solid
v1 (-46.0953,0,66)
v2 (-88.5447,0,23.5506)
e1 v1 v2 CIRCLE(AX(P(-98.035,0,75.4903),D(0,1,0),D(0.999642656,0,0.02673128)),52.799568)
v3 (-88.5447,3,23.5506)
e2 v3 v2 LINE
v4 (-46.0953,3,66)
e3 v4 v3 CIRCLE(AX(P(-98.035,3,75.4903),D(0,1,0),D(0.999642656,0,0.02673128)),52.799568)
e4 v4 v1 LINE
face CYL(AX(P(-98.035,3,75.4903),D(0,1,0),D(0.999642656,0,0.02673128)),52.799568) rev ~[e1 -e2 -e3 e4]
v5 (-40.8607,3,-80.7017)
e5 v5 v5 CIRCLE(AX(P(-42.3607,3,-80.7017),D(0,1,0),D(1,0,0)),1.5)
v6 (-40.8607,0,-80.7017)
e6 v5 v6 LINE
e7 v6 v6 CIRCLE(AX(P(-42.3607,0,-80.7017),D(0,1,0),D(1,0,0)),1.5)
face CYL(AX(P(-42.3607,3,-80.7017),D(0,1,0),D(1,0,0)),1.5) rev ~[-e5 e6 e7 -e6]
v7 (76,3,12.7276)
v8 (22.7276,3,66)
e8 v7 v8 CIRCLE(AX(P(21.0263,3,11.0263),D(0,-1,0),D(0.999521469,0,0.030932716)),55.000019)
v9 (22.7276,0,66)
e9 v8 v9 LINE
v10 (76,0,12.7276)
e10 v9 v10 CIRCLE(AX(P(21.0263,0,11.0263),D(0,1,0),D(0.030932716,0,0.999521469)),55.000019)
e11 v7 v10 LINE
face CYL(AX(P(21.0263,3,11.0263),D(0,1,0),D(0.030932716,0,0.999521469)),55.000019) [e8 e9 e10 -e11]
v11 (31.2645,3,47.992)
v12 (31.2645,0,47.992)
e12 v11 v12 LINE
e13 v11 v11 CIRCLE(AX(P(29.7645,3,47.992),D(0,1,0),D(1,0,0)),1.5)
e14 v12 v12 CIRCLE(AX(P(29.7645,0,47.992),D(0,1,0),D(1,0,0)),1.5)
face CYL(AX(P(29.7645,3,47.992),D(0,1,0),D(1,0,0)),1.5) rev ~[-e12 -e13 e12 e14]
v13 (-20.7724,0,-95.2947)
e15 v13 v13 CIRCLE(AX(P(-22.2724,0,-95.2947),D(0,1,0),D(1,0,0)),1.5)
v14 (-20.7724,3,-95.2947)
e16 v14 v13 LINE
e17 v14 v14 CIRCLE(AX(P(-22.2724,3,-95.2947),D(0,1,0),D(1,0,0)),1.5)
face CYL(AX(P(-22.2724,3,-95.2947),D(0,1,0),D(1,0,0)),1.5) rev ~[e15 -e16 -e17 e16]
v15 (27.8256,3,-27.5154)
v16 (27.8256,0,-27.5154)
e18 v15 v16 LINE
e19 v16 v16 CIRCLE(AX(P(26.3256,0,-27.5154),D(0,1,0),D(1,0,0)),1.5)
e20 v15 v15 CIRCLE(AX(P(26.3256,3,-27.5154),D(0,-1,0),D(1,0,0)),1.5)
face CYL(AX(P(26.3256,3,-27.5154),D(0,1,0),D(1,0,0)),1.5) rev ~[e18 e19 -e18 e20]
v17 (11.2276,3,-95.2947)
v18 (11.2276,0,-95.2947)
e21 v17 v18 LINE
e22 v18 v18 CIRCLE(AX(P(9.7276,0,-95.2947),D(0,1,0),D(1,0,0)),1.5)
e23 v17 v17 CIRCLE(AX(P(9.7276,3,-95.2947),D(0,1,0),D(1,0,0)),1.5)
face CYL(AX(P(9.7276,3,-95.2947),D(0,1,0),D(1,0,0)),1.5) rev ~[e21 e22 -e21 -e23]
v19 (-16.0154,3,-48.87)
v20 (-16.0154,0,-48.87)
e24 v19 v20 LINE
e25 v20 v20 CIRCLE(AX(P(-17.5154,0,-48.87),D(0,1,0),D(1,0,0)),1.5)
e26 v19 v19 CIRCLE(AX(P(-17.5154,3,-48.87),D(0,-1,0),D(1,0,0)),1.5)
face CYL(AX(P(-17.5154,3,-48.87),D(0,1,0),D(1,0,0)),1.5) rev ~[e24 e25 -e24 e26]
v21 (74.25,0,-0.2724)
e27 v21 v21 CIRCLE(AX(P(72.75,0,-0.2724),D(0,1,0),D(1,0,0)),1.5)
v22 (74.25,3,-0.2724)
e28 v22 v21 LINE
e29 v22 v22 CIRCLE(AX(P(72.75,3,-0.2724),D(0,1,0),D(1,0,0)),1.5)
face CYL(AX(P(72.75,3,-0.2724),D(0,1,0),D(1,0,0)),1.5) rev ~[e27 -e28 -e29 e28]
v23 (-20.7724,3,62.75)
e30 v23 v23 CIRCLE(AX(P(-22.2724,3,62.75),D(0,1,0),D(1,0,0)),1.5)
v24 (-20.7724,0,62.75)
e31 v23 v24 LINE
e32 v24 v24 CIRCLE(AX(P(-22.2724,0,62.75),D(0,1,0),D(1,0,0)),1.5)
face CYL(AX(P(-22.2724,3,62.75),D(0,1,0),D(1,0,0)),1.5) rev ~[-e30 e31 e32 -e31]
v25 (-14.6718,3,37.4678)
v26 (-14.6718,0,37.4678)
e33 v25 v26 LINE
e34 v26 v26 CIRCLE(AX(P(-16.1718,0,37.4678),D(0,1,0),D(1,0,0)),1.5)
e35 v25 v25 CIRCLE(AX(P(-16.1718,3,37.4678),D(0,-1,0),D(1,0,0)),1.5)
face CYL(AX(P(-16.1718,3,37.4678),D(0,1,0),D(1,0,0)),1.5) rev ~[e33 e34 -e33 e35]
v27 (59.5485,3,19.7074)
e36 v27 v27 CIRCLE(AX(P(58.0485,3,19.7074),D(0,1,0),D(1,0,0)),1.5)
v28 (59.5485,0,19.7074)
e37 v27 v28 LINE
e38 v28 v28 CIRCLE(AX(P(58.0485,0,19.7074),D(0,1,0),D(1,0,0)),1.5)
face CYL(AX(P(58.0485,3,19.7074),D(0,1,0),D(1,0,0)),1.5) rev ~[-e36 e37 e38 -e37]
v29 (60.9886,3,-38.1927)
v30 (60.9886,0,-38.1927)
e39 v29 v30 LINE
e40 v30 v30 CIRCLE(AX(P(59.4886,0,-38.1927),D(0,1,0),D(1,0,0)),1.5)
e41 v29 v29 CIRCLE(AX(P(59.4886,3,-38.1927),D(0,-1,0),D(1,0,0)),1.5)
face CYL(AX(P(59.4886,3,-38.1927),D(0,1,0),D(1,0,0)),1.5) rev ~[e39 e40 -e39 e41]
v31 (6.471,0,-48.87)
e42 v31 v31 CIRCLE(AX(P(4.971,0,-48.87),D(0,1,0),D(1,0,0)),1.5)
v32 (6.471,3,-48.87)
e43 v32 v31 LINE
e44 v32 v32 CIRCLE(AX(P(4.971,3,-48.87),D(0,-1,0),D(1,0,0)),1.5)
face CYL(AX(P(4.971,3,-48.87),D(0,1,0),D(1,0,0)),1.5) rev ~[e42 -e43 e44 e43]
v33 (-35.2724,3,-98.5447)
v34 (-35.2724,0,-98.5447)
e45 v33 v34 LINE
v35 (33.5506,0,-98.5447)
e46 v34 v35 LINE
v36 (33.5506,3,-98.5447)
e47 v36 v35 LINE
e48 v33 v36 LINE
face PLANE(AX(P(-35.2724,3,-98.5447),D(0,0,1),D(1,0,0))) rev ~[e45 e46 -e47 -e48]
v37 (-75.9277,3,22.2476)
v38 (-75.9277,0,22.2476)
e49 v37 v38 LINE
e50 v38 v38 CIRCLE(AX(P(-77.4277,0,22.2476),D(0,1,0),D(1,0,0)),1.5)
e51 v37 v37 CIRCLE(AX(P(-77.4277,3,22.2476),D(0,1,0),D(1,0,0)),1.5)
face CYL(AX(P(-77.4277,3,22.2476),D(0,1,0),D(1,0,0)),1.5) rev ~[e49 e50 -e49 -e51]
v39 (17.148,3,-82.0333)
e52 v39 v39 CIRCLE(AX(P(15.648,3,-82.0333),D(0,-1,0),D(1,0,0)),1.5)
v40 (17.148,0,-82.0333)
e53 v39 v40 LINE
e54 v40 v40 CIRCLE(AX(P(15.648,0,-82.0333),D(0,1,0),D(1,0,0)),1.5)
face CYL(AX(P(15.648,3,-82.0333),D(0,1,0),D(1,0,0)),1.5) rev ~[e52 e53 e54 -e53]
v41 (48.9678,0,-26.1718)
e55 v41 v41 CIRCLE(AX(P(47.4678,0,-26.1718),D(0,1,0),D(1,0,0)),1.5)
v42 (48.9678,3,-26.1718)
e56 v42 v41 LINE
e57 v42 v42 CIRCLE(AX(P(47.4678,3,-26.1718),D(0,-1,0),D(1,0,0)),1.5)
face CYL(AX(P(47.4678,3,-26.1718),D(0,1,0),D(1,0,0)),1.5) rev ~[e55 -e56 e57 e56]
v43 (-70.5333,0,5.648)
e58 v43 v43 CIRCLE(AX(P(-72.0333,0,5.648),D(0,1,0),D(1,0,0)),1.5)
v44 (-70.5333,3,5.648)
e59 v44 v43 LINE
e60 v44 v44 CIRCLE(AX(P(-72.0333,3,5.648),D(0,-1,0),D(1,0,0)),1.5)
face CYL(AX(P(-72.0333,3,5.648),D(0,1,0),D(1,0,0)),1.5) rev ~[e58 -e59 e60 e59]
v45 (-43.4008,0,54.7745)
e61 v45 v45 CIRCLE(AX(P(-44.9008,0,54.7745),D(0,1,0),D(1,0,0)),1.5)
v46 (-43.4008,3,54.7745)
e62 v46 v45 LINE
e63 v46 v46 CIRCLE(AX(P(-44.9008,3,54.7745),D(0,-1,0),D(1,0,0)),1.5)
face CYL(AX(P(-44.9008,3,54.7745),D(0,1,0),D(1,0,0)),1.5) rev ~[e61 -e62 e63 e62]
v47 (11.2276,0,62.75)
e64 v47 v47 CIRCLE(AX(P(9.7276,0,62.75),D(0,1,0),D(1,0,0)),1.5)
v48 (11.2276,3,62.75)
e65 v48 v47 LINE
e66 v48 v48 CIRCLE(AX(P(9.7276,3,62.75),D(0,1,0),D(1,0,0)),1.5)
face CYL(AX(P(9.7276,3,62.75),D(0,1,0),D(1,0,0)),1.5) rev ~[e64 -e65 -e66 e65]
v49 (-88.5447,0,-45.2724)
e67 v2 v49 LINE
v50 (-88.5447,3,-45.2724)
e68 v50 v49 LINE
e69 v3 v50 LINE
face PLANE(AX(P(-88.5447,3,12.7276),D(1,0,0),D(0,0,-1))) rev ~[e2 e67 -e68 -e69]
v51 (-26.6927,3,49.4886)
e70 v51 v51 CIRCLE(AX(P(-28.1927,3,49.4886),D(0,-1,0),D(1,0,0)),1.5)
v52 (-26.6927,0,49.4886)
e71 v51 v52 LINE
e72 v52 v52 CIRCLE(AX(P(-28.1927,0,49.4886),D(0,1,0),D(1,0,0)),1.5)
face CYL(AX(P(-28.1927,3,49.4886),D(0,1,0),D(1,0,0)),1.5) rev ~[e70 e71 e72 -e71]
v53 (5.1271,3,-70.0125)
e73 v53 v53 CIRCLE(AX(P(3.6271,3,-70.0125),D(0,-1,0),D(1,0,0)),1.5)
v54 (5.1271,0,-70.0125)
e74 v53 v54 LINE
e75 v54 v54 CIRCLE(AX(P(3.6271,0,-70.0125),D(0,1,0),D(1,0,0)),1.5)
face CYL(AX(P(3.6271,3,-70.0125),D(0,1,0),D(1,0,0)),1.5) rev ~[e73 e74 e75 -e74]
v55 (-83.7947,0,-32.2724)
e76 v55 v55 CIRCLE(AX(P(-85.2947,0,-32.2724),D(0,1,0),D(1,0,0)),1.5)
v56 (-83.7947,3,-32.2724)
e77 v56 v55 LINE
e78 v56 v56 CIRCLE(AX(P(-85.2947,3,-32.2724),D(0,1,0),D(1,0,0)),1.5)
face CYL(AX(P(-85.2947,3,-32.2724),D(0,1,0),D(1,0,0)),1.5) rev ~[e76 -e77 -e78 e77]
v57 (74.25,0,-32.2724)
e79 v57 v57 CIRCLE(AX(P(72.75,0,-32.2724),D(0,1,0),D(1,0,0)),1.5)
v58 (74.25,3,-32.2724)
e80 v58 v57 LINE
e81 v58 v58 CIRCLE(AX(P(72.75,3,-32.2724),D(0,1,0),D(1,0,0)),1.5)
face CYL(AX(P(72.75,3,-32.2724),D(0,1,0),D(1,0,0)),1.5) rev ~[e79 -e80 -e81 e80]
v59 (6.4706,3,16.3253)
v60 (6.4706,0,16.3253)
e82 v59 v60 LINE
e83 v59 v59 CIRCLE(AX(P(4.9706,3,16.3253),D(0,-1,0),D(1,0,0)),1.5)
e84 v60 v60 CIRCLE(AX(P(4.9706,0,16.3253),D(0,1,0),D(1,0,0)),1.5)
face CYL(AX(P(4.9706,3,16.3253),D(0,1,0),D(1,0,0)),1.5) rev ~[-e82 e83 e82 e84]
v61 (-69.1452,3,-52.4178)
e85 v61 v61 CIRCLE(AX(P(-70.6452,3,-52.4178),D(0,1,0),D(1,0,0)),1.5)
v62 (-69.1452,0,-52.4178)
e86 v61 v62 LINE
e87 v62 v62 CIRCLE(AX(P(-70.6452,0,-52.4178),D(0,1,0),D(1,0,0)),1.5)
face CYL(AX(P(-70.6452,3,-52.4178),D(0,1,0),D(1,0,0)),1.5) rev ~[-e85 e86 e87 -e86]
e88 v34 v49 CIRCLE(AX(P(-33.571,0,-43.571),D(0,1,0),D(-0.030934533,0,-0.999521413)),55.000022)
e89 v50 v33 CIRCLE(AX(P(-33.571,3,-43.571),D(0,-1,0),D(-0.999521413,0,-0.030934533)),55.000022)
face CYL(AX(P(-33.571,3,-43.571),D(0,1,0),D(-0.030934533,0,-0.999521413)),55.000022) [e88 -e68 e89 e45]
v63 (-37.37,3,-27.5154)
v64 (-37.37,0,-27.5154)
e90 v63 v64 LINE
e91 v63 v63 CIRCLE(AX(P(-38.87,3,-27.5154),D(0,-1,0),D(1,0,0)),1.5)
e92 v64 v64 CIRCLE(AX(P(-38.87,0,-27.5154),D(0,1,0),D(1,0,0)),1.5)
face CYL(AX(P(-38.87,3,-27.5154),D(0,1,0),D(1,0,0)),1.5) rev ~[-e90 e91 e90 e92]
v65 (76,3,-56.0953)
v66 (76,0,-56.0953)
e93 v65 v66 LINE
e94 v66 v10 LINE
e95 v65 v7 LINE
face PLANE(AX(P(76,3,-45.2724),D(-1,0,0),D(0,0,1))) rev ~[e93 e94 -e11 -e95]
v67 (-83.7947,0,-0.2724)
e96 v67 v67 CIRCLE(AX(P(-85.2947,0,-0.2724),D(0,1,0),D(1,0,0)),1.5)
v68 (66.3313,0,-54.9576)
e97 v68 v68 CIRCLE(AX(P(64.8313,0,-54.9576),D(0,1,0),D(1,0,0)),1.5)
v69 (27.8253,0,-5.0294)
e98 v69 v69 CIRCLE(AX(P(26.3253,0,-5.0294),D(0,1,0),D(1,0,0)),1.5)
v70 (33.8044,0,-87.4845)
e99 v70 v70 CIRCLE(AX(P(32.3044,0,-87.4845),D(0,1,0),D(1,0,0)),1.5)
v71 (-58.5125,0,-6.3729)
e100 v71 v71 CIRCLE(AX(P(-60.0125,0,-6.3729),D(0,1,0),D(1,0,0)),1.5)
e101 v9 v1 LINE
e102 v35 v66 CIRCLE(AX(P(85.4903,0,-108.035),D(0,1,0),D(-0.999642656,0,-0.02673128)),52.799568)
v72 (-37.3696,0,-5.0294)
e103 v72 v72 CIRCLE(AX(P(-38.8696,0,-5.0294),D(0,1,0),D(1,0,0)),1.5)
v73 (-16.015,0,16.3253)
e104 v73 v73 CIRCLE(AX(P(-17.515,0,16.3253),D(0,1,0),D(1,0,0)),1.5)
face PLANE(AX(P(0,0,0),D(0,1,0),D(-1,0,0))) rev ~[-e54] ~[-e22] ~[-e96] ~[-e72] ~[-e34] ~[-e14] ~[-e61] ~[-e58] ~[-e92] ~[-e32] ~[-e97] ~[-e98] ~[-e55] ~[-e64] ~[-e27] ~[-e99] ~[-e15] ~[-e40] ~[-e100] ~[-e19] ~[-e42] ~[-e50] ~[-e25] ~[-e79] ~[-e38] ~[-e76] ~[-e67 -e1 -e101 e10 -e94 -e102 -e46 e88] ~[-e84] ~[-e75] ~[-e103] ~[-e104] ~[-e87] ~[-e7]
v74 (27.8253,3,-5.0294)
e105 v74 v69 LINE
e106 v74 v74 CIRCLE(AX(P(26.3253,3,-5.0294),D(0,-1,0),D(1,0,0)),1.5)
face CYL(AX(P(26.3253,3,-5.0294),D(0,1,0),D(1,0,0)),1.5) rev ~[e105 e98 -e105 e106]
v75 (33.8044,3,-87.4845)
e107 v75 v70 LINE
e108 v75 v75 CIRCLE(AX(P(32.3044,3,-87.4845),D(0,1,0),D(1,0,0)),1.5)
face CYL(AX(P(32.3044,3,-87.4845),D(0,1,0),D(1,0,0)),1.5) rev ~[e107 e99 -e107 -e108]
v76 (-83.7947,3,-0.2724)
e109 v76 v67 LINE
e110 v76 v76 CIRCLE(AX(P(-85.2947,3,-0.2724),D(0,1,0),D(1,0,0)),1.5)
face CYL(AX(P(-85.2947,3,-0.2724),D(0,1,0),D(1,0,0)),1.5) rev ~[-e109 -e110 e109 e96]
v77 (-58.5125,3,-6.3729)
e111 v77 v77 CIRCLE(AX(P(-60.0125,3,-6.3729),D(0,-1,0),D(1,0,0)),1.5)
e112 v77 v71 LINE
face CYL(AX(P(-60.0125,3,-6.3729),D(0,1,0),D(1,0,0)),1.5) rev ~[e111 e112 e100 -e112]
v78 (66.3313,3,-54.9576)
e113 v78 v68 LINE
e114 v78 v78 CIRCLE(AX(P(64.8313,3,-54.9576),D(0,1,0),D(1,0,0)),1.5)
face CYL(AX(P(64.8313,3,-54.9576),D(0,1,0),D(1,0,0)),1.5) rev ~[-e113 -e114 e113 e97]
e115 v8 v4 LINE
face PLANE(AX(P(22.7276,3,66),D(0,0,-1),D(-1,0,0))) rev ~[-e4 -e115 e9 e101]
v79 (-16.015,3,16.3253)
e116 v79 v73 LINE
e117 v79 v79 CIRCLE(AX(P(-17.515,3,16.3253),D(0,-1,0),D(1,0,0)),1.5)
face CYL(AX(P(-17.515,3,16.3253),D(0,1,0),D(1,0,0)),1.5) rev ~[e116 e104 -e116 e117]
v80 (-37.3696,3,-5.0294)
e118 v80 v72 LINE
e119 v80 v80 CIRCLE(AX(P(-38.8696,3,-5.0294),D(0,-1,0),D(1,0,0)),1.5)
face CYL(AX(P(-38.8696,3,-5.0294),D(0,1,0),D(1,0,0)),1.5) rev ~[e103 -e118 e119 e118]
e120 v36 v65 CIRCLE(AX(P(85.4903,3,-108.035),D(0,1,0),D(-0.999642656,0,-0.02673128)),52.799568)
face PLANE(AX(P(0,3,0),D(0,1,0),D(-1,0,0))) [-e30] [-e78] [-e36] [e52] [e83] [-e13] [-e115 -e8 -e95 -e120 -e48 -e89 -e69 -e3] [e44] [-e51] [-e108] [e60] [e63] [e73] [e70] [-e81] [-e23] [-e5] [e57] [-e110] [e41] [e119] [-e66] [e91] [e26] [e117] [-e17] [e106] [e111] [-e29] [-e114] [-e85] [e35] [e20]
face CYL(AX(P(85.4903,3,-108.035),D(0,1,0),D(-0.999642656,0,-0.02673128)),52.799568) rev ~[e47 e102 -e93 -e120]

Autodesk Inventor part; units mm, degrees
ref_plane "YZ Plane" through (0, 0, 0) normal (1, 0, 0) x (0, 1, 0)
ref_plane "XZ Plane" through (0, 0, 0) normal (0, 1, 0) x (-1, 0, 0)
ref_plane "XY Plane" through (0, 0, 0) normal (0, 0, 1) x (1, 0, 0)
sketch "Эскиз1" plane through (0, 0, 0) normal (0, 1, 0) x (-1, 0, 0)
  line L0 (-79, -47.2724) -> (-79, 14.7276)
  line L1 (91.5447, -47.2724) -> (91.5447, 14.7276)
  line L2 (-79, -47.2724) -> (-93, -47.2724)
  line L3 (-79, 14.7276) -> (-93, 14.7276)
  line L4 (91.5447, -47.2724) -> (105.5447, -47.2724)
  line L5 (91.5447, 14.7276) -> (105.5447, 14.7276)
  line L6 (-24.7276, -101.5447) -> (37.2724, -101.5447)
  line L7 (-24.7276, 69) -> (37.2724, 69)
  line L8 (-24.7276, 69) -> (-24.7276, 83)
  line L9 (37.2724, 69) -> (37.2724, 83)
  line L10 (37.2724, -101.5447) -> (37.2724, -115.5447)
  line L11 (-24.7276, -101.5447) -> (-24.7276, -115.5447)
  arc A0 (-93, -47.2724) -> (-24.7276, -115.5447) centre (6.2724, -16.2724) ccw
  arc A1 (105.5447, 14.7276) -> (37.2724, 83) centre (6.2724, -16.2724) ccw
  arc A2 (-24.7276, 83) -> (-93, 14.7276) centre (6.2724, -16.2724) ccw
  arc A3 (37.2724, -115.5447) -> (105.5447, -47.2724) centre (6.2724, -16.2724) ccw
  dimension "d29" = 62
  dimension "d31" = 62
  dimension "d33" = 14
  dimension "d34" = 14
  dimension "d35" = 62
  dimension "d36" = 62
  dimension "d39" = 14
  dimension "d40" = 14
  dimension "d256" = 104
  dimension "d257" = 104
  dimension "d258" = 104
  dimension "d259" = 104
  dimension "d260" = 14
  dimension "d261" = 14
  dimension "d262" = 14
  dimension "d263" = 14
  dimension "d264" = 68.2724
  dimension "d265" = 68.2724
  dimension "d266" = 68.2724
extrude "motor" add sketch "Эскиз1" along normal blind 3
sketch "Эскиз2" plane through (0, 3, 0) normal (0, 1, 0) x (1, 0, 0)
  arc A0 (24.7276, -83) -> (93, -14.7276) centre (-6.2724, 16.2724) ccw projected
  arc A1 (-37.2724, 115.5447) -> (-105.5447, 47.2724) centre (-6.2724, 16.2724) ccw projected
  circle A2 centre (-6.2724, 16.2724) radius 104
  line L0 (-6.2724, 16.2724) -> (-6.2724, -50.7276)
  arc A3 (-37.2724, 115.5447) -> (-105.5447, 47.2724) centre (-6.2724, 16.2724) ccw projected
  line L1 (-88.7917, -14.3063) -> (-40.8426, -62.2554)
  line L2 (-101.3809, -25.8032) -> (-48.3479, -78.8362)
  arc A4 (-105.5447, -14.7276) -> (-37.2724, -83) centre (-6.2724, 16.2724) ccw projected
  arc A5 (-48.3479, -78.8362) -> (-101.3809, -25.8032) centre (-98.035, -75.4903) ccw
  arc A6 (24.7276, -83) -> (93, -14.7276) centre (-6.2724, 16.2724) ccw projected
  line L3 (-79.8115, 89.8115) -> (67.2668, -57.2668)
  line L4 (24.3063, 98.7917) -> (72.2554, 50.8426)
  line L5 (35.8032, 111.3809) -> (88.8362, 58.3479)
  arc A7 (93, 47.2724) -> (24.7276, 115.5447) centre (-6.2724, 16.2724) ccw
  arc A8 (35.8032, 111.3809) -> (88.8362, 58.3479) centre (85.4903, 108.035) ccw
  line L6 (-91.5447, -14.7276) -> (-105.5447, -14.7276) projected
  arc A9 (-105.5447, -14.7276) -> (-101.3809, -25.8032) centre (-6.2724, 16.2724) ccw
  line L7 (-105.5447, -14.7276) -> (-80, -14.7276)
  point P0 (0, 0)
  point P1 (-6.2724, -50.7276)
  dimension "d181" = 208
  dimension "d190" = 67
  dimension "d205" = 75
  dimension "d207" = 17.0315
  dimension "d208" = 11.0756
  dimension "d209" = 104
extrude "ball" cut sketch "Эскиз2" against normal blind 3 contours A2 L2 | L2 A5 | L5 A2 | A8 L5
sketch "Эскиз3" plane through (0, 3, 0) normal (0, 1, 0) x (1, 0, 0)
  arc A0 (93, 47.2724) -> (24.7276, 115.5447) centre (-6.2724, 16.2724) ccw projected
  line L0 (-6.2724, 16.2724) -> (97.7276, 16.2724) construction
  line L1 (67.2668, 89.8115) -> (-62.5447, -40)
  circle A1 centre (70.5306, -44.2673) radius 1.5
  circle A2 centre (54.2672, -60.5308) radius 1.5
  circle A3 centre (41.3053, -71.6104) radius 1.5
  circle A4 centre (81.6104, -31.3053) radius 1.5
  arc A5 (24.7276, -83) -> (93, -14.7276) centre (-6.2724, 16.2724) ccw projected
  line L2 (-6.2724, 16.2724) -> (97.7276, 16.2724) construction
  line L3 (-79.8115, 89.8115) -> (67.2668, -57.2668)
  line L4 (-91.5447, 47.2724) -> (-91.5447, -14.7276) projected
  line L5 (-91.5447, 16.2724) -> (79, 16.2724)
  line L6 (24.7276, 101.5447) -> (-37.2724, 101.5447) projected
  line L7 (-6.2724, 101.5447) -> (-6.2724, -69)
  line L8 (-6.2724, 101.5447) -> (-6.2724, -69)
  line L9 (-91.5447, 47.2724) -> (-91.5447, -14.7276) projected
  arc A6 (24.7276, -83) -> (93, -14.7276) centre (-6.2724, 16.2724) ccw projected
  circle A7 centre (-66.812, 93.0753) radius 1.5
  circle A8 centre (-83.0755, 76.8119) radius 1.5
  circle A9 centre (-94.1551, 63.85) radius 1.5
  circle A10 centre (-53.85, 104.1551) radius 1.5
  point P0 (0, 0)
  point P1 (67.2668, -57.2668)
  point P2 (67.2668, -57.2668)
  point P3 (-105.5447, 47.2724)
  point P4 (-79.8115, 89.8115)
  point P5 (-79.8115, 89.8115)
  point P6 (-79.8115, 89.8115)
  dimension "d65" = 3
  dimension "d66" = 3
  dimension "d67" = 3
  dimension "d68" = 3
  dimension "d69" = 23
  dimension "d71" = 57
  dimension "d74" = -12.962
  dimension "d78" = 25.9614
extrude "hand_mount" cut sketch "Эскиз3" against normal blind 10
sketch "Эскиз5" plane through (0, 3, 0) normal (0, 1, 0) x (1, 0, 0)
  circle A0 centre (29.7645, -47.992) radius 1.5
  circle A1 centre (58.0485, -19.7074) radius 1.5
  circle A2 centre (-6.2982, 16.355) radius 104
  arc A3 (-105.5447, -14.7276) -> (-99.04, -30.7083) centre (-6.2982, 16.355) ccw projected
  line L0 (-6.2982, 16.355) -> (97.7018, 16.355) construction
  line L1 (67.2409, 89.8941) -> (-79.8373, -57.1841)
  circle A4 centre (-70.6452, 52.4178) radius 1.5
  circle A5 centre (-42.3607, 80.7017) radius 1.5
  circle A6 centre (-44.9008, -54.7745) radius 1.5
  line L2 (-46.7704, -39.7817) -> (-62, -24)
  arc A7 (-53.253, -76.4953) -> (-99.04, -30.7083) centre (-88.8109, -66.2662) ccw projected
  line L3 (-62.7022, -40.049) -> (-61.1643, -38.511)
  line L4 (-61.1643, -38.511) -> (-44.8852, -38.511) construction
  line L5 (-61.1643, -38.511) -> (-44.9008, -54.7745)
  circle A8 centre (-77.4277, -22.2476) radius 1.5
  arc A9 (24.7276, -83) -> (93, -14.7276) centre (-6.2724, 16.2724) ccw projected
  line L6 (-6.2982, 16.355) -> (97.7785, 16.355) construction
  line L7 (67.2952, -57.2383) -> (-79.783, 89.8399)
  arc A10 (-37.2724, 115.5447) -> (-105.5447, 47.2724) centre (-6.2724, 16.2724) ccw projected
  circle A11 centre (64.8313, 54.9576) radius 1.5
  circle A12 centre (32.3044, 87.4845) radius 1.5
  point P0 (0, 0)
  dimension "d119" = 208
  dimension "d116" = 3
  dimension "d117" = 3
  dimension "d118" = 40
  dimension "d121" = 64.347
  dimension "d126" = 3
  dimension "d130" = 2.175
  dimension "d133" = 23
extrude "Выдавливание5" cut sketch "Эскиз5" against normal blind 10 contours A0 | A1 | A4 | A5 | A6 | A8 | A11 | A12
sketch "Эскиз6" plane through (0, 3, 0) normal (0, 1, 0) x (1, 0, 0)
  circle A0 centre (-22.2724, 95.2947) radius 1.5
  circle A1 centre (9.7276, 95.2947) radius 1.5
  line L0 (24.7276, 115.5447) -> (24.7276, 101.5447) projected
  line L1 (24.7276, 101.5447) -> (-37.2724, 101.5447) projected
  circle A2 centre (-22.2724, -62.75) radius 1.5
  circle A3 centre (9.7276, -62.75) radius 1.5
  circle A4 centre (-85.2947, 32.2724) radius 1.5
  circle A5 centre (-85.2947, 0.2724) radius 1.5
  circle A6 centre (72.75, 32.2724) radius 1.5
  circle A7 centre (72.75, 0.2724) radius 1.5
  point P0 (0, 0)
  point P1 (24.7276, -69)
  point P2 (-37.2724, -69)
  point P3 (-91.5447, -14.7276)
  point P4 (-91.5447, 47.2724)
  point P5 (79, 47.2724)
  point P6 (79, -14.7276)
  dimension "d135" = 3
  dimension "d136" = 3
  dimension "d137" = 32
  dimension "d138" = 15
  dimension "d139" = 6.25
  dimension "d140" = 3
  dimension "d141" = 3
  dimension "d142" = 6.25
  dimension "d143" = 32
  dimension "d144" = 15
  dimension "d145" = 6.25
  dimension "d146" = 6.25
  dimension "d147" = 3
  dimension "d148" = 3
  dimension "d149" = 32
  dimension "d150" = 15
  dimension "d151" = 6.25
  dimension "d152" = 6.25
  dimension "d153" = 3
  dimension "d154" = 3
  dimension "d155" = 32
  dimension "d156" = 15
  dimension "d157" = 6.25
  dimension "d158" = 6.25
extrude "Выдавливание6" cut sketch "Эскиз6" against normal blind 10
fillet "Сопряжение1" radius 2 20 edges at (88.8362, 1.5, -58.3479) (35.8032, 1.5, -111.3809) (93, 1.5, -47.2724) (24.7276, 1.5, -115.5447) (24.7276, 1.5, -101.5447) (-37.2724, 1.5, -101.5447) (-37.2724, 1.5, -115.5447) (-105.5447, 1.5, -47.2724) (-91.5447, 1.5, -47.2724) (-91.5447, 1.5, 14.7276) (-105.5447, 1.5, 14.7276) (-48.3479, 1.5, 78.8362) (-101.3809, 1.5, 25.8032) (-37.2724, 1.5, 83) (-37.2724, 1.5, 69) (24.7276, 1.5, 69) (24.7276, 1.5, 83) (93, 1.5, 14.7276) (79, 1.5, 14.7276) (79, 1.5, -47.2724)
fillet_without_effect "Сопряжение4"
sketch "Эскиз8" plane through (0, 3, 0) normal (0, 1, 0) x (1, 0, 0)
  circle A0 centre (-75.6509, 84.2365) radius 1.6
  circle A1 centre (62.8514, -51.4283) radius 1.6
  circle A2 centre (-83.0755, 76.8119) radius 1.5
  circle A3 centre (-83.0755, 76.8119) radius 1.5 projected
  line L0 (-83.0755, 76.8119) -> (-75.6509, 84.2365)
  line L1 (-83.0755, 76.8119) -> (-72.5755, 76.8119) construction
  circle A4 centre (54.2672, -60.5308) radius 1.5
  circle A5 centre (54.2672, -60.5308) radius 1.5 projected
  line L2 (54.2672, -60.5308) -> (67.7672, -60.5308) construction
  circle A6 centre (70.5306, -44.2673) radius 1.5
  circle A7 centre (70.5306, -44.2673) radius 1.5 projected
  line L3 (70.5306, -44.2673) -> (62.8514, -51.4283)
  line L4 (70.5306, -44.2673) -> (81.0306, -44.2673) construction
  point P0 (0, 0)
  dimension "d211" = 3.2
  dimension "d212" = 3.2
  dimension "d213" = 3
  dimension "d214" = 10.5
  dimension "d215" = 45
  dimension "d216" = 3
  dimension "d221" = 3
  dimension "d222" = 10.5
  dimension "d223" = 137
extrude "Выдавливание7" cut sketch "Эскиз8" against normal blind 10 contours A0 | A1
sketch "Эскиз9" plane through (0, 3, 0) normal (0, 1, 0) x (1, 0, 0)
  line L0 (-38.87, 27.5154) -> (-17.5154, 48.87)
  line L1 (-17.5154, 48.87) -> (26.3253, 5.0294)
  line L2 (26.3253, 5.0294) -> (4.9706, -16.3253)
  line L3 (4.9706, -16.3253) -> (-38.87, 27.5154)
  circle A0 centre (-6.2724, 16.2724) radius 104
  arc A1 (-39.9194, 114.679) -> (-104.679, 49.9194) centre (-6.2724, 16.2724) ccw projected
  circle A2 centre (-17.5154, 48.87) radius 1.5
  circle A3 centre (-38.87, 27.5154) radius 1.5
  circle A4 centre (4.9706, -16.3253) radius 1.5
  circle A5 centre (26.3253, 5.0294) radius 1.5
  point P0 (0, 0)
  dimension "d224" = 30.2
  dimension "d225" = 62
  dimension "d226" = 208
  dimension "d227" = 15.1
  dimension "d229" = 31
  dimension "d230" = 3
  dimension "d231" = 3
  dimension "d232" = 3
  dimension "d233" = 3
extrude "Выдавливание8" cut sketch "Эскиз9" against normal blind 10 contours L3 A3 L0 | L0 A3 L3 | A2 L1 L0 | L0 L1 A2 | A4 L2 L3 | L3 L2 A4 | A5 L2 L1 | L1 L2 A5
sketch "Эскиз10" plane through (0, 3, 0) normal (0, 1, 0) x (1, 0, 0)
  circle A0 centre (-6.2724, 16.2719) radius 104.0005
  arc A1 (-39.9194, 114.679) -> (-104.679, 49.9194) centre (-6.2724, 16.2724) ccw projected
  line L0 (-60.0125, 6.3729) -> (-72.0333, -5.648)
  line L1 (-72.0333, -5.648) -> (-28.1927, -49.4886)
  line L2 (-28.1927, -49.4886) -> (-16.1718, -37.4678)
  line L3 (-16.1718, -37.4678) -> (-60.0125, 6.3729)
  circle A2 centre (-60.0125, 6.3729) radius 1.5
  circle A3 centre (-72.0333, -5.648) radius 1.5
  circle A4 centre (-16.1718, -37.4678) radius 1.5
  circle A5 centre (-28.1927, -49.4886) radius 1.5
  line L4 (-6.2724, 16.2724) -> (67.2668, -57.2668)
  arc A6 (27.3747, -82.1343) -> (92.1343, -17.3747) centre (-6.2724, 16.2724) ccw projected
  line L5 (-6.2724, 16.2724) -> (97.7276, 16.2724) construction
  line L6 (67.2668, -57.2668) -> (-79.8115, 89.8115)
  line L7 (3.6271, 70.0125) -> (15.648, 82.0333)
  line L8 (15.648, 82.0333) -> (59.4886, 38.1927)
  line L9 (59.4886, 38.1927) -> (47.4678, 26.1718)
  line L10 (47.4678, 26.1718) -> (3.6271, 70.0125)
  circle A7 centre (3.6271, 70.0125) radius 1.5
  circle A8 centre (15.648, 82.0333) radius 1.5
  circle A9 centre (47.4678, 26.1718) radius 1.5
  circle A10 centre (59.4886, 38.1927) radius 1.5
  point P0 (0, 0)
  point P1 (10, 10)
  point P2 (-6.2719, 16.2724)
  dimension "d248" = 17
  dimension "d249" = 62
  dimension "d250" = 9.899
  dimension "d251" = 45
  dimension "d252" = 3
  dimension "d253" = 3
  dimension "d254" = 3
  dimension "d255" = 3
  dimension "d282" = 45
extrude "Выдавливание9" cut sketch "Эскиз10" against normal blind 10 contours L3 A2 L0 | L0 A2 L3 | A3 L1 L0 | L0 L1 A3 | A4 L2 L3 | L3 L2 A4 | A5 L2 L1 | L1 L2 A5 | L10 A7 L7 | L7 A7 L10 | A8 L8 L7 | L7 L8 A8 | A9 L9 L10 | L10 L9 A9 | A10 L9 L8 | L8 L9 A10
sketch "Эскиз14" plane through (0, 3, 0) normal (0, 1, 0) x (1, 0, 0)
  line L0 (-38.8696, 5.0294) -> (4.971, 48.87)
  line L1 (4.971, 48.87) -> (26.3256, 27.5154)
  line L2 (26.3256, 27.5154) -> (-17.515, -16.3253)
  line L3 (-17.515, -16.3253) -> (-38.8696, 5.0294)
  circle A0 centre (47.4678, 26.1718) radius 1.5 projected
  circle A1 centre (-28.1927, -49.4886) radius 1.5 projected
  circle A2 centre (-72.0333, -5.648) radius 1.5 projected
  circle A3 centre (15.648, 82.0333) radius 1.5 projected
  circle A4 centre (59.4886, 38.1927) radius 1.5 projected
  circle A5 centre (-16.1718, -37.4678) radius 1.5 projected
  circle A6 centre (-60.0125, 6.3729) radius 1.5 projected
  circle A7 centre (3.6271, 70.0125) radius 1.5 projected
  circle A8 centre (4.9706, -16.3253) radius 1.5 projected
  circle A9 centre (-17.5154, 48.87) radius 1.5 projected
  circle A10 centre (26.3253, 5.0294) radius 1.5 projected
  circle A11 centre (-38.87, 27.5154) radius 1.5 projected
  circle A12 centre (62.8514, -51.4283) radius 1.6 projected
  circle A13 centre (-75.6509, 84.2365) radius 1.6 projected
  arc A14 (89.3952, 57.061) -> (87.4757, 58.275) centre (87.5555, 56.2766) ccw projected
  arc A15 (35.7303, 110.0204) -> (87.4757, 58.275) centre (85.4903, 108.035) ccw projected
  arc A16 (35.7303, 110.0204) -> (34.5163, 111.9399) centre (33.7319, 110.1002) ccw projected
  arc A17 (34.5163, 111.9399) -> (27.3747, 114.679) centre (-6.2724, 16.2724) ccw projected
  arc A18 (27.3747, 114.679) -> (24.7276, 112.7866) centre (26.7276, 112.7866) ccw projected
  line L4 (24.7276, 112.7866) -> (24.7276, 103.5447) projected
  arc A19 (22.7276, 101.5447) -> (24.7276, 103.5447) centre (22.7276, 103.5447) ccw projected
  line L5 (22.7276, 101.5447) -> (-35.2724, 101.5447) projected
  arc A20 (-37.2724, 103.5447) -> (-35.2724, 101.5447) centre (-35.2724, 103.5447) ccw projected
  line L6 (-37.2724, 103.5447) -> (-37.2724, 112.7866) projected
  arc A21 (-37.2724, 112.7866) -> (-39.9194, 114.679) centre (-39.2724, 112.7866) ccw projected
  arc A22 (-39.9194, 114.679) -> (-104.679, 49.9194) centre (-6.2724, 16.2724) ccw projected
  arc A23 (-104.679, 49.9194) -> (-102.7866, 47.2724) centre (-102.7866, 49.2724) ccw projected
  line L7 (-102.7866, 47.2724) -> (-93.5447, 47.2724) projected
  arc A24 (-91.5447, 45.2724) -> (-93.5447, 47.2724) centre (-93.5447, 45.2724) ccw projected
  line L8 (-91.5447, 45.2724) -> (-91.5447, -12.7276) projected
  arc A25 (-93.5447, -14.7276) -> (-91.5447, -12.7276) centre (-93.5447, -12.7276) ccw projected
  line L9 (-93.5447, -14.7276) -> (-102.7866, -14.7276) projected
  arc A26 (-102.7866, -14.7276) -> (-104.679, -17.3747) centre (-102.7866, -16.7276) ccw projected
  arc A27 (-104.679, -17.3747) -> (-101.9399, -24.5163) centre (-6.2724, 16.2724) ccw projected
  arc A28 (-101.9399, -24.5163) -> (-100.0204, -25.7303) centre (-100.1002, -23.7319) ccw projected
  arc A29 (-48.275, -77.4757) -> (-100.0204, -25.7303) centre (-98.035, -75.4903) ccw projected
  arc A30 (-48.275, -77.4757) -> (-47.061, -79.3952) centre (-46.2766, -77.5555) ccw projected
  arc A31 (-47.061, -79.3952) -> (-39.9194, -82.1343) centre (-6.2724, 16.2724) ccw projected
  arc A32 (-39.9194, -82.1343) -> (-37.2724, -80.2419) centre (-39.2724, -80.2419) ccw projected
  line L10 (-37.2724, -80.2419) -> (-37.2724, -71) projected
  arc A33 (-35.2724, -69) -> (-37.2724, -71) centre (-35.2724, -71) ccw projected
  line L11 (-35.2724, -69) -> (22.7276, -69) projected
  arc A34 (24.7276, -71) -> (22.7276, -69) centre (22.7276, -71) ccw projected
  line L12 (24.7276, -71) -> (24.7276, -80.2419) projected
  arc A35 (24.7276, -80.2419) -> (27.3747, -82.1343) centre (26.7276, -80.2419) ccw projected
  arc A36 (27.3747, -82.1343) -> (92.1343, -17.3747) centre (-6.2724, 16.2724) ccw projected
  arc A37 (92.1343, -17.3747) -> (90.2419, -14.7276) centre (90.2419, -16.7276) ccw projected
  line L13 (90.2419, -14.7276) -> (81, -14.7276) projected
  arc A38 (79, -12.7276) -> (81, -14.7276) centre (81, -12.7276) ccw projected
  line L14 (79, -12.7276) -> (79, 45.2724) projected
  arc A39 (81, 47.2724) -> (79, 45.2724) centre (81, 45.2724) ccw projected
  line L15 (81, 47.2724) -> (90.2419, 47.2724) projected
  arc A40 (90.2419, 47.2724) -> (92.1343, 49.9194) centre (90.2419, 49.2724) ccw projected
  arc A41 (92.1343, 49.9194) -> (89.3952, 57.061) centre (-6.2724, 16.2724) ccw projected
  circle A42 centre (-94.1551, 63.85) radius 1.5 projected
  circle A43 centre (41.3053, -71.6104) radius 1.5 projected
  circle A44 centre (81.6104, -31.3053) radius 1.5 projected
  circle A45 centre (-53.85, 104.1551) radius 1.5 projected
  circle A46 centre (-83.0755, 76.8119) radius 1.5 projected
  circle A47 centre (54.2672, -60.5308) radius 1.5 projected
  circle A48 centre (70.5306, -44.2673) radius 1.5 projected
  circle A49 centre (-66.812, 93.0753) radius 1.5 projected
  circle A50 centre (-44.9008, -54.7745) radius 1.5 projected
  circle A51 centre (29.7645, -47.992) radius 1.5 projected
  circle A52 centre (-42.3607, 80.7017) radius 1.5 projected
  circle A53 centre (32.3044, 87.4845) radius 1.5 projected
  circle A54 centre (-77.4277, -22.2476) radius 1.5 projected
  circle A55 centre (58.0485, -19.7074) radius 1.5 projected
  circle A56 centre (-70.6452, 52.4178) radius 1.5 projected
  circle A57 centre (64.8313, 54.9576) radius 1.5 projected
  circle A58 centre (-85.2947, 0.2724) radius 1.5 projected
  circle A59 centre (72.75, 0.2724) radius 1.5 projected
  circle A60 centre (-22.2724, 95.2947) radius 1.5 projected
  circle A61 centre (9.7276, -62.75) radius 1.5 projected
  circle A62 centre (-85.2947, 32.2724) radius 1.5 projected
  circle A63 centre (72.75, 32.2724) radius 1.5 projected
  circle A64 centre (9.7276, 95.2947) radius 1.5 projected
  circle A65 centre (-22.2724, -62.75) radius 1.5 projected
  circle A66 centre (-38.8696, 5.0294) radius 1.5
  circle A67 centre (-17.515, -16.3253) radius 1.5
  circle A68 centre (4.971, 48.87) radius 1.5
  circle A69 centre (26.3256, 27.5154) radius 1.5
  point P0 (0, 0)
  dimension "d283" = 30.2
  dimension "d284" = 62
  dimension "d285" = 32.598
  dimension "d286" = 32.5976
  dimension "d287" = 3
  dimension "d288" = 3
  dimension "d289" = 3
  dimension "d290" = 3
sketch "Эскиз13" plane through (0, 3, 0) normal (0, 1, 0) x (1, 0, 0)
  circle A0 centre (-28.1927, -49.4886) radius 1.5 projected
  circle A1 centre (-72.0333, -5.648) radius 1.5 projected
  circle A2 centre (-16.1718, -37.4678) radius 1.5 projected
  circle A3 centre (-60.0125, 6.3729) radius 1.5 projected
  circle A4 centre (4.9706, -16.3253) radius 1.5 projected
  circle A5 centre (-17.5154, 48.87) radius 1.5 projected
  circle A6 centre (26.3253, 5.0294) radius 1.5 projected
  circle A7 centre (-38.87, 27.5154) radius 1.5 projected
  circle A8 centre (62.8514, -51.4283) radius 1.6 projected
  circle A9 centre (-75.6509, 84.2365) radius 1.6 projected
  arc A10 (89.3952, 57.061) -> (87.4757, 58.275) centre (87.5555, 56.2766) ccw projected
  arc A11 (35.7303, 110.0204) -> (87.4757, 58.275) centre (85.4903, 108.035) ccw projected
  arc A12 (35.7303, 110.0204) -> (34.5163, 111.9399) centre (33.7319, 110.1002) ccw projected
  arc A13 (34.5163, 111.9399) -> (27.3747, 114.679) centre (-6.2724, 16.2724) ccw projected
  arc A14 (27.3747, 114.679) -> (24.7276, 112.7866) centre (26.7276, 112.7866) ccw projected
  line L0 (24.7276, 112.7866) -> (24.7276, 103.5447) projected
  arc A15 (22.7276, 101.5447) -> (24.7276, 103.5447) centre (22.7276, 103.5447) ccw projected
  line L1 (22.7276, 101.5447) -> (-35.2724, 101.5447) projected
  arc A16 (-37.2724, 103.5447) -> (-35.2724, 101.5447) centre (-35.2724, 103.5447) ccw projected
  line L2 (-37.2724, 103.5447) -> (-37.2724, 112.7866) projected
  arc A17 (-37.2724, 112.7866) -> (-39.9194, 114.679) centre (-39.2724, 112.7866) ccw projected
  arc A18 (-39.9194, 114.679) -> (-104.679, 49.9194) centre (-6.2724, 16.2724) ccw projected
  arc A19 (-104.679, 49.9194) -> (-102.7866, 47.2724) centre (-102.7866, 49.2724) ccw projected
  line L3 (-102.7866, 47.2724) -> (-93.5447, 47.2724) projected
  arc A20 (-91.5447, 45.2724) -> (-93.5447, 47.2724) centre (-93.5447, 45.2724) ccw projected
  line L4 (-91.5447, 45.2724) -> (-91.5447, -12.7276) projected
  arc A21 (-93.5447, -14.7276) -> (-91.5447, -12.7276) centre (-93.5447, -12.7276) ccw projected
  line L5 (-93.5447, -14.7276) -> (-102.7866, -14.7276) projected
  arc A22 (-102.7866, -14.7276) -> (-104.679, -17.3747) centre (-102.7866, -16.7276) ccw projected
  arc A23 (-104.679, -17.3747) -> (-101.9399, -24.5163) centre (-6.2724, 16.2724) ccw projected
  arc A24 (-101.9399, -24.5163) -> (-100.0204, -25.7303) centre (-100.1002, -23.7319) ccw projected
  arc A25 (-48.275, -77.4757) -> (-100.0204, -25.7303) centre (-98.035, -75.4903) ccw projected
  arc A26 (-48.275, -77.4757) -> (-47.061, -79.3952) centre (-46.2766, -77.5555) ccw projected
  arc A27 (-47.061, -79.3952) -> (-39.9194, -82.1343) centre (-6.2724, 16.2724) ccw projected
  arc A28 (-39.9194, -82.1343) -> (-37.2724, -80.2419) centre (-39.2724, -80.2419) ccw projected
  line L6 (-37.2724, -80.2419) -> (-37.2724, -71) projected
  arc A29 (-35.2724, -69) -> (-37.2724, -71) centre (-35.2724, -71) ccw projected
  line L7 (-35.2724, -69) -> (22.7276, -69) projected
  arc A30 (24.7276, -71) -> (22.7276, -69) centre (22.7276, -71) ccw projected
  line L8 (24.7276, -71) -> (24.7276, -80.2419) projected
  arc A31 (24.7276, -80.2419) -> (27.3747, -82.1343) centre (26.7276, -80.2419) ccw projected
  arc A32 (27.3747, -82.1343) -> (92.1343, -17.3747) centre (-6.2724, 16.2724) ccw projected
  arc A33 (92.1343, -17.3747) -> (90.2419, -14.7276) centre (90.2419, -16.7276) ccw projected
  line L9 (90.2419, -14.7276) -> (81, -14.7276) projected
  arc A34 (79, -12.7276) -> (81, -14.7276) centre (81, -12.7276) ccw projected
  line L10 (79, -12.7276) -> (79, 45.2724) projected
  arc A35 (81, 47.2724) -> (79, 45.2724) centre (81, 45.2724) ccw projected
  line L11 (81, 47.2724) -> (90.2419, 47.2724) projected
  arc A36 (90.2419, 47.2724) -> (92.1343, 49.9194) centre (90.2419, 49.2724) ccw projected
  arc A37 (92.1343, 49.9194) -> (89.3952, 57.061) centre (-6.2724, 16.2724) ccw projected
  circle A38 centre (-94.1551, 63.85) radius 1.5 projected
  circle A39 centre (41.3053, -71.6104) radius 1.5 projected
  circle A40 centre (81.6104, -31.3053) radius 1.5 projected
  circle A41 centre (-53.85, 104.1551) radius 1.5 projected
  circle A42 centre (-83.0755, 76.8119) radius 1.5 projected
  circle A43 centre (54.2672, -60.5308) radius 1.5 projected
  circle A44 centre (70.5306, -44.2673) radius 1.5 projected
  circle A45 centre (-66.812, 93.0753) radius 1.5 projected
  circle A46 centre (-44.9008, -54.7745) radius 1.5 projected
  circle A47 centre (29.7645, -47.992) radius 1.5 projected
  circle A48 centre (-42.3607, 80.7017) radius 1.5 projected
  circle A49 centre (32.3044, 87.4845) radius 1.5 projected
  circle A50 centre (-77.4277, -22.2476) radius 1.5 projected
  circle A51 centre (58.0485, -19.7074) radius 1.5 projected
  circle A52 centre (-70.6452, 52.4178) radius 1.5 projected
  circle A53 centre (64.8313, 54.9576) radius 1.5 projected
  circle A54 centre (-85.2947, 0.2724) radius 1.5 projected
  circle A55 centre (72.75, 0.2724) radius 1.5 projected
  circle A56 centre (-22.2724, 95.2947) radius 1.5 projected
  circle A57 centre (9.7276, -62.75) radius 1.5 projected
  circle A58 centre (-85.2947, 32.2724) radius 1.5 projected
  circle A59 centre (72.75, 32.2724) radius 1.5 projected
  circle A60 centre (9.7276, 95.2947) radius 1.5 projected
  circle A61 centre (-22.2724, -62.75) radius 1.5 projected
  line L12 (-86.5447, -12.7276) -> (-86.5447, 45.2724)
  arc A62 (-86.5447, 45.2724) -> (-93.5447, 52.2724) centre (-93.5447, 45.2724) ccw
  line L13 (-93.5447, 52.2724) -> (-98.4949, 52.2724)
  arc A63 (-42.2724, 108.4949) -> (-98.4949, 52.2724) centre (-6.2724, 16.2724) ccw
  line L14 (-42.2724, 108.4949) -> (-42.2724, 103.5447)
  arc A64 (-42.2724, 103.5447) -> (-35.2724, 96.5447) centre (-35.2724, 103.5447) ccw
  line L15 (-35.2724, 96.5447) -> (22.7276, 96.5447)
  arc A65 (32.8155, 92.9235) -> (70.3788, 55.3602) centre (85.4903, 108.035) ccw
  line L16 (74, 45.2724) -> (74, -12.7276)
  arc A66 (74, -12.7276) -> (81, -19.7276) centre (81, -12.7276) ccw
  line L17 (81, -19.7276) -> (85.9502, -19.7276)
  arc A67 (29.7276, -75.9502) -> (85.9502, -19.7276) centre (-6.2724, 16.2724) ccw
  line L18 (29.7276, -75.9502) -> (29.7276, -71)
  arc A68 (29.7276, -71) -> (22.7276, -64) centre (22.7276, -71) ccw
  line L19 (22.7276, -64) -> (-35.2724, -64)
  arc A69 (-45.3602, -60.3788) -> (-82.9235, -22.8155) centre (-98.035, -75.4903) ccw
  line L20 (-35.2724, -69) -> (22.7276, -69) projected
  line L21 (-35.2724, -64) -> (-40.554, -64)
  line L22 (-86.5447, -12.7276) -> (-86.5447, -18.0093)
  line L23 (22.7276, 96.5447) -> (28.0093, 96.5447)
  line L24 (74, 45.2724) -> (74, 50.554)
  arc A70 (74, 50.554) -> (70.3788, 55.3602) centre (69, 50.554) ccw
  arc A71 (32.8155, 92.9235) -> (28.0093, 96.5447) centre (28.0093, 91.5447) ccw
  arc A72 (-86.5447, -18.0093) -> (-82.9235, -22.8155) centre (-81.5447, -18.0093) ccw
  arc A73 (-45.3602, -60.3788) -> (-40.554, -64) centre (-40.554, -59) ccw
  arc A74 (-82.3013, -18.0093) -> (-81.7533, -18.7365) centre (-81.5447, -18.0093) ccw
  line L25 (22.7276, -69) -> (-35.2724, -69)
  arc A75 (-35.2724, -66) -> (-40.2724, -71) centre (-35.2724, -71) ccw
  line L26 (-40.2724, -71) -> (-40.2724, -78.8329)
  arc A76 (-45.2543, -76.9017) -> (-40.2724, -78.8329) centre (-6.2724, 16.2724) ccw
  arc A77 (-45.2543, -76.9017) -> (-99.4464, -22.7096) centre (-98.035, -75.4903) ccw
  arc A78 (-101.3776, -17.7276) -> (-99.4464, -22.7096) centre (-6.2724, 16.2724) ccw
  line L27 (-101.3776, -17.7276) -> (-93.5447, -17.7276)
  arc A79 (-93.5447, -17.7276) -> (-88.5447, -12.7276) centre (-93.5447, -12.7276) ccw
  line L28 (-88.5447, -12.7276) -> (-88.5447, 45.2724)
  arc A80 (-88.5447, 45.2724) -> (-93.5447, 50.2724) centre (-93.5447, 45.2724) ccw
  line L29 (-93.5447, 50.2724) -> (-101.3776, 50.2724)
  arc A81 (-40.2724, 111.3776) -> (-101.3776, 50.2724) centre (-6.2724, 16.2724) ccw
  line L30 (-40.2724, 111.3776) -> (-40.2724, 103.5447)
  arc A82 (-40.2724, 103.5447) -> (-35.2724, 98.5447) centre (-35.2724, 103.5447) ccw
  line L31 (-35.2724, 98.5447) -> (22.7276, 98.5447)
  arc A83 (22.7276, 98.5447) -> (27.7276, 103.5447) centre (22.7276, 103.5447) ccw
  line L32 (27.7276, 103.5447) -> (27.7276, 111.3776)
  arc A84 (32.7096, 109.4464) -> (27.7276, 111.3776) centre (-6.2724, 16.2724) ccw
  arc A85 (32.7096, 109.4464) -> (86.9017, 55.2543) centre (85.4903, 108.035) ccw
  line L33 (76, 45.2724) -> (76, -12.7276)
  arc A86 (76, -12.7276) -> (81, -17.7276) centre (81, -12.7276) ccw
  line L34 (81, -17.7276) -> (88.8329, -17.7276)
  arc A87 (27.7276, -78.8329) -> (88.8329, -17.7276) centre (-6.2724, 16.2724) ccw
  line L35 (27.7276, -78.8329) -> (27.7276, -71)
  arc A88 (27.7276, -71) -> (22.7276, -66) centre (22.7276, -71) ccw
  line L36 (22.7276, -66) -> (-35.2724, -66)
  line L37 (76, 45.2724) -> (76, 56.0953)
  line L38 (-35.2724, -66) -> (-46.0953, -66)
  line L39 (22.7276, 98.5447) -> (33.5506, 98.5447)
  line L40 (-88.5447, -12.7276) -> (-88.5447, -23.5506)
  arc A89 (-35.2724, 98.5447) -> (-88.5447, 45.2724) centre (-33.571, 43.571) ccw
  arc A90 (22.7276, -66) -> (76, -12.7276) centre (21.0263, -11.0263) ccw
  point P0 (0, 0)
  point P1 (-44.4536, -64)
  point P2 (-86.5447, -21.9089)
  point P3 (31.9089, 96.5447)
  point P4 (74, 54.4536)
  point P5 (46.7411, 69.2858)
  point P6 (50.2767, 72.8214)
  point P7 (-93.8825, 62.375)
  point P8 (-92.771, 64.4282)
  point P9 (-84.575, 76.8504)
  point P10 (-83.4632, 78.2609)
  point P11 (-68.2611, 93.463)
  point P12 (-66.8506, 94.5748)
  point P13 (-54.4282, 102.771)
  point P14 (-52.375, 103.8825)
  point P15 (-23.1015, 96.5447)
  point P16 (-21.4432, 96.5447)
  point P17 (8.8985, 96.5447)
  point P18 (10.5568, 96.5447)
  point P19 (74, 33.1015)
  point P20 (74, 31.4432)
  point P21 (74, 1.1015)
  point P22 (74, -0.5568)
  point P23 (81.3378, -29.8303)
  point P24 (80.2263, -31.8835)
  point P25 (72.0301, -44.3059)
  point P26 (70.9183, -45.7164)
  point P27 (55.7162, -60.9185)
  point P28 (54.3057, -62.0303)
  point P29 (41.8835, -70.2263)
  point P30 (39.8303, -71.3378)
  point P31 (10.5568, -64)
  point P32 (8.8985, -64)
  point P33 (-21.4432, -64)
  point P34 (-23.1015, -64)
  point P35 (-86.5447, -0.5568)
  point P36 (-86.5447, 1.1015)
  point P37 (-86.5447, 31.4432)
  point P38 (-86.5447, 33.1015)
  point P39 (-95.5923, 63.4205)
  point P40 (-94.5811, 65.2883)
  point P41 (-55.2883, 104.5811)
  point P42 (-53.4205, 105.5923)
  point P43 (83.0476, -30.8758)
  point P44 (82.0364, -32.7436)
  point P45 (42.7436, -72.0364)
  point P46 (40.8758, -73.0476)
  dimension "d267" = 5
  dimension "d268" = 5
  dimension "d269" = 5
  dimension "d270" = 5
  dimension "d271" = 3.5355
  dimension "d276" = 3
  dimension "d279" = 55
  dimension "d281" = 55
extrude "Выдавливание11" cut sketch "Эскиз13" against normal blind 10 contours A37 A36 L11 A35 L10 A34 L9 A33 A32 A31 L8 A30 L7 A29 L6 A28 A27 A26 A25 A24 A23 A22 L5 A21 L4 A20 L3 A19 A18 A17 L2 A16 L1 A15 L0 A14 A13 A12 A11 A10 | A38 A63 A42 A45 A41 L14 A64 A89 A62 L13 | A38 A81 A41 A63 A45 A42 | A63 L13 A62 A89 A80 L29 A81 A38 | A81 L30 A82 A89 A64 L14 A63 A41 | L40 A77 A78 L27 A79 | A83 L32 A84 A85 L39 | L38 A75 L26 A76 A77 | A90 A68 L18 A67 A39 A87 L35 A88 | A90 A66 L17 A67 A40 A44 A43 A39 L18 A68 | A86 L34 A87 A40 A67 L17 A66 A90 | A39 A67 A43 A44 A40 A87
extrude "Выдавливание12" cut sketch "Эскиз14" against normal blind 10 contours L3 A66 L0 | L0 A66 L3 | A68 L1 L0 | L0 L1 A68 | A67 L2 L3 | L3 L2 A67 | A69 L2 L1 | L1 L2 A69
properties part number "plat"
